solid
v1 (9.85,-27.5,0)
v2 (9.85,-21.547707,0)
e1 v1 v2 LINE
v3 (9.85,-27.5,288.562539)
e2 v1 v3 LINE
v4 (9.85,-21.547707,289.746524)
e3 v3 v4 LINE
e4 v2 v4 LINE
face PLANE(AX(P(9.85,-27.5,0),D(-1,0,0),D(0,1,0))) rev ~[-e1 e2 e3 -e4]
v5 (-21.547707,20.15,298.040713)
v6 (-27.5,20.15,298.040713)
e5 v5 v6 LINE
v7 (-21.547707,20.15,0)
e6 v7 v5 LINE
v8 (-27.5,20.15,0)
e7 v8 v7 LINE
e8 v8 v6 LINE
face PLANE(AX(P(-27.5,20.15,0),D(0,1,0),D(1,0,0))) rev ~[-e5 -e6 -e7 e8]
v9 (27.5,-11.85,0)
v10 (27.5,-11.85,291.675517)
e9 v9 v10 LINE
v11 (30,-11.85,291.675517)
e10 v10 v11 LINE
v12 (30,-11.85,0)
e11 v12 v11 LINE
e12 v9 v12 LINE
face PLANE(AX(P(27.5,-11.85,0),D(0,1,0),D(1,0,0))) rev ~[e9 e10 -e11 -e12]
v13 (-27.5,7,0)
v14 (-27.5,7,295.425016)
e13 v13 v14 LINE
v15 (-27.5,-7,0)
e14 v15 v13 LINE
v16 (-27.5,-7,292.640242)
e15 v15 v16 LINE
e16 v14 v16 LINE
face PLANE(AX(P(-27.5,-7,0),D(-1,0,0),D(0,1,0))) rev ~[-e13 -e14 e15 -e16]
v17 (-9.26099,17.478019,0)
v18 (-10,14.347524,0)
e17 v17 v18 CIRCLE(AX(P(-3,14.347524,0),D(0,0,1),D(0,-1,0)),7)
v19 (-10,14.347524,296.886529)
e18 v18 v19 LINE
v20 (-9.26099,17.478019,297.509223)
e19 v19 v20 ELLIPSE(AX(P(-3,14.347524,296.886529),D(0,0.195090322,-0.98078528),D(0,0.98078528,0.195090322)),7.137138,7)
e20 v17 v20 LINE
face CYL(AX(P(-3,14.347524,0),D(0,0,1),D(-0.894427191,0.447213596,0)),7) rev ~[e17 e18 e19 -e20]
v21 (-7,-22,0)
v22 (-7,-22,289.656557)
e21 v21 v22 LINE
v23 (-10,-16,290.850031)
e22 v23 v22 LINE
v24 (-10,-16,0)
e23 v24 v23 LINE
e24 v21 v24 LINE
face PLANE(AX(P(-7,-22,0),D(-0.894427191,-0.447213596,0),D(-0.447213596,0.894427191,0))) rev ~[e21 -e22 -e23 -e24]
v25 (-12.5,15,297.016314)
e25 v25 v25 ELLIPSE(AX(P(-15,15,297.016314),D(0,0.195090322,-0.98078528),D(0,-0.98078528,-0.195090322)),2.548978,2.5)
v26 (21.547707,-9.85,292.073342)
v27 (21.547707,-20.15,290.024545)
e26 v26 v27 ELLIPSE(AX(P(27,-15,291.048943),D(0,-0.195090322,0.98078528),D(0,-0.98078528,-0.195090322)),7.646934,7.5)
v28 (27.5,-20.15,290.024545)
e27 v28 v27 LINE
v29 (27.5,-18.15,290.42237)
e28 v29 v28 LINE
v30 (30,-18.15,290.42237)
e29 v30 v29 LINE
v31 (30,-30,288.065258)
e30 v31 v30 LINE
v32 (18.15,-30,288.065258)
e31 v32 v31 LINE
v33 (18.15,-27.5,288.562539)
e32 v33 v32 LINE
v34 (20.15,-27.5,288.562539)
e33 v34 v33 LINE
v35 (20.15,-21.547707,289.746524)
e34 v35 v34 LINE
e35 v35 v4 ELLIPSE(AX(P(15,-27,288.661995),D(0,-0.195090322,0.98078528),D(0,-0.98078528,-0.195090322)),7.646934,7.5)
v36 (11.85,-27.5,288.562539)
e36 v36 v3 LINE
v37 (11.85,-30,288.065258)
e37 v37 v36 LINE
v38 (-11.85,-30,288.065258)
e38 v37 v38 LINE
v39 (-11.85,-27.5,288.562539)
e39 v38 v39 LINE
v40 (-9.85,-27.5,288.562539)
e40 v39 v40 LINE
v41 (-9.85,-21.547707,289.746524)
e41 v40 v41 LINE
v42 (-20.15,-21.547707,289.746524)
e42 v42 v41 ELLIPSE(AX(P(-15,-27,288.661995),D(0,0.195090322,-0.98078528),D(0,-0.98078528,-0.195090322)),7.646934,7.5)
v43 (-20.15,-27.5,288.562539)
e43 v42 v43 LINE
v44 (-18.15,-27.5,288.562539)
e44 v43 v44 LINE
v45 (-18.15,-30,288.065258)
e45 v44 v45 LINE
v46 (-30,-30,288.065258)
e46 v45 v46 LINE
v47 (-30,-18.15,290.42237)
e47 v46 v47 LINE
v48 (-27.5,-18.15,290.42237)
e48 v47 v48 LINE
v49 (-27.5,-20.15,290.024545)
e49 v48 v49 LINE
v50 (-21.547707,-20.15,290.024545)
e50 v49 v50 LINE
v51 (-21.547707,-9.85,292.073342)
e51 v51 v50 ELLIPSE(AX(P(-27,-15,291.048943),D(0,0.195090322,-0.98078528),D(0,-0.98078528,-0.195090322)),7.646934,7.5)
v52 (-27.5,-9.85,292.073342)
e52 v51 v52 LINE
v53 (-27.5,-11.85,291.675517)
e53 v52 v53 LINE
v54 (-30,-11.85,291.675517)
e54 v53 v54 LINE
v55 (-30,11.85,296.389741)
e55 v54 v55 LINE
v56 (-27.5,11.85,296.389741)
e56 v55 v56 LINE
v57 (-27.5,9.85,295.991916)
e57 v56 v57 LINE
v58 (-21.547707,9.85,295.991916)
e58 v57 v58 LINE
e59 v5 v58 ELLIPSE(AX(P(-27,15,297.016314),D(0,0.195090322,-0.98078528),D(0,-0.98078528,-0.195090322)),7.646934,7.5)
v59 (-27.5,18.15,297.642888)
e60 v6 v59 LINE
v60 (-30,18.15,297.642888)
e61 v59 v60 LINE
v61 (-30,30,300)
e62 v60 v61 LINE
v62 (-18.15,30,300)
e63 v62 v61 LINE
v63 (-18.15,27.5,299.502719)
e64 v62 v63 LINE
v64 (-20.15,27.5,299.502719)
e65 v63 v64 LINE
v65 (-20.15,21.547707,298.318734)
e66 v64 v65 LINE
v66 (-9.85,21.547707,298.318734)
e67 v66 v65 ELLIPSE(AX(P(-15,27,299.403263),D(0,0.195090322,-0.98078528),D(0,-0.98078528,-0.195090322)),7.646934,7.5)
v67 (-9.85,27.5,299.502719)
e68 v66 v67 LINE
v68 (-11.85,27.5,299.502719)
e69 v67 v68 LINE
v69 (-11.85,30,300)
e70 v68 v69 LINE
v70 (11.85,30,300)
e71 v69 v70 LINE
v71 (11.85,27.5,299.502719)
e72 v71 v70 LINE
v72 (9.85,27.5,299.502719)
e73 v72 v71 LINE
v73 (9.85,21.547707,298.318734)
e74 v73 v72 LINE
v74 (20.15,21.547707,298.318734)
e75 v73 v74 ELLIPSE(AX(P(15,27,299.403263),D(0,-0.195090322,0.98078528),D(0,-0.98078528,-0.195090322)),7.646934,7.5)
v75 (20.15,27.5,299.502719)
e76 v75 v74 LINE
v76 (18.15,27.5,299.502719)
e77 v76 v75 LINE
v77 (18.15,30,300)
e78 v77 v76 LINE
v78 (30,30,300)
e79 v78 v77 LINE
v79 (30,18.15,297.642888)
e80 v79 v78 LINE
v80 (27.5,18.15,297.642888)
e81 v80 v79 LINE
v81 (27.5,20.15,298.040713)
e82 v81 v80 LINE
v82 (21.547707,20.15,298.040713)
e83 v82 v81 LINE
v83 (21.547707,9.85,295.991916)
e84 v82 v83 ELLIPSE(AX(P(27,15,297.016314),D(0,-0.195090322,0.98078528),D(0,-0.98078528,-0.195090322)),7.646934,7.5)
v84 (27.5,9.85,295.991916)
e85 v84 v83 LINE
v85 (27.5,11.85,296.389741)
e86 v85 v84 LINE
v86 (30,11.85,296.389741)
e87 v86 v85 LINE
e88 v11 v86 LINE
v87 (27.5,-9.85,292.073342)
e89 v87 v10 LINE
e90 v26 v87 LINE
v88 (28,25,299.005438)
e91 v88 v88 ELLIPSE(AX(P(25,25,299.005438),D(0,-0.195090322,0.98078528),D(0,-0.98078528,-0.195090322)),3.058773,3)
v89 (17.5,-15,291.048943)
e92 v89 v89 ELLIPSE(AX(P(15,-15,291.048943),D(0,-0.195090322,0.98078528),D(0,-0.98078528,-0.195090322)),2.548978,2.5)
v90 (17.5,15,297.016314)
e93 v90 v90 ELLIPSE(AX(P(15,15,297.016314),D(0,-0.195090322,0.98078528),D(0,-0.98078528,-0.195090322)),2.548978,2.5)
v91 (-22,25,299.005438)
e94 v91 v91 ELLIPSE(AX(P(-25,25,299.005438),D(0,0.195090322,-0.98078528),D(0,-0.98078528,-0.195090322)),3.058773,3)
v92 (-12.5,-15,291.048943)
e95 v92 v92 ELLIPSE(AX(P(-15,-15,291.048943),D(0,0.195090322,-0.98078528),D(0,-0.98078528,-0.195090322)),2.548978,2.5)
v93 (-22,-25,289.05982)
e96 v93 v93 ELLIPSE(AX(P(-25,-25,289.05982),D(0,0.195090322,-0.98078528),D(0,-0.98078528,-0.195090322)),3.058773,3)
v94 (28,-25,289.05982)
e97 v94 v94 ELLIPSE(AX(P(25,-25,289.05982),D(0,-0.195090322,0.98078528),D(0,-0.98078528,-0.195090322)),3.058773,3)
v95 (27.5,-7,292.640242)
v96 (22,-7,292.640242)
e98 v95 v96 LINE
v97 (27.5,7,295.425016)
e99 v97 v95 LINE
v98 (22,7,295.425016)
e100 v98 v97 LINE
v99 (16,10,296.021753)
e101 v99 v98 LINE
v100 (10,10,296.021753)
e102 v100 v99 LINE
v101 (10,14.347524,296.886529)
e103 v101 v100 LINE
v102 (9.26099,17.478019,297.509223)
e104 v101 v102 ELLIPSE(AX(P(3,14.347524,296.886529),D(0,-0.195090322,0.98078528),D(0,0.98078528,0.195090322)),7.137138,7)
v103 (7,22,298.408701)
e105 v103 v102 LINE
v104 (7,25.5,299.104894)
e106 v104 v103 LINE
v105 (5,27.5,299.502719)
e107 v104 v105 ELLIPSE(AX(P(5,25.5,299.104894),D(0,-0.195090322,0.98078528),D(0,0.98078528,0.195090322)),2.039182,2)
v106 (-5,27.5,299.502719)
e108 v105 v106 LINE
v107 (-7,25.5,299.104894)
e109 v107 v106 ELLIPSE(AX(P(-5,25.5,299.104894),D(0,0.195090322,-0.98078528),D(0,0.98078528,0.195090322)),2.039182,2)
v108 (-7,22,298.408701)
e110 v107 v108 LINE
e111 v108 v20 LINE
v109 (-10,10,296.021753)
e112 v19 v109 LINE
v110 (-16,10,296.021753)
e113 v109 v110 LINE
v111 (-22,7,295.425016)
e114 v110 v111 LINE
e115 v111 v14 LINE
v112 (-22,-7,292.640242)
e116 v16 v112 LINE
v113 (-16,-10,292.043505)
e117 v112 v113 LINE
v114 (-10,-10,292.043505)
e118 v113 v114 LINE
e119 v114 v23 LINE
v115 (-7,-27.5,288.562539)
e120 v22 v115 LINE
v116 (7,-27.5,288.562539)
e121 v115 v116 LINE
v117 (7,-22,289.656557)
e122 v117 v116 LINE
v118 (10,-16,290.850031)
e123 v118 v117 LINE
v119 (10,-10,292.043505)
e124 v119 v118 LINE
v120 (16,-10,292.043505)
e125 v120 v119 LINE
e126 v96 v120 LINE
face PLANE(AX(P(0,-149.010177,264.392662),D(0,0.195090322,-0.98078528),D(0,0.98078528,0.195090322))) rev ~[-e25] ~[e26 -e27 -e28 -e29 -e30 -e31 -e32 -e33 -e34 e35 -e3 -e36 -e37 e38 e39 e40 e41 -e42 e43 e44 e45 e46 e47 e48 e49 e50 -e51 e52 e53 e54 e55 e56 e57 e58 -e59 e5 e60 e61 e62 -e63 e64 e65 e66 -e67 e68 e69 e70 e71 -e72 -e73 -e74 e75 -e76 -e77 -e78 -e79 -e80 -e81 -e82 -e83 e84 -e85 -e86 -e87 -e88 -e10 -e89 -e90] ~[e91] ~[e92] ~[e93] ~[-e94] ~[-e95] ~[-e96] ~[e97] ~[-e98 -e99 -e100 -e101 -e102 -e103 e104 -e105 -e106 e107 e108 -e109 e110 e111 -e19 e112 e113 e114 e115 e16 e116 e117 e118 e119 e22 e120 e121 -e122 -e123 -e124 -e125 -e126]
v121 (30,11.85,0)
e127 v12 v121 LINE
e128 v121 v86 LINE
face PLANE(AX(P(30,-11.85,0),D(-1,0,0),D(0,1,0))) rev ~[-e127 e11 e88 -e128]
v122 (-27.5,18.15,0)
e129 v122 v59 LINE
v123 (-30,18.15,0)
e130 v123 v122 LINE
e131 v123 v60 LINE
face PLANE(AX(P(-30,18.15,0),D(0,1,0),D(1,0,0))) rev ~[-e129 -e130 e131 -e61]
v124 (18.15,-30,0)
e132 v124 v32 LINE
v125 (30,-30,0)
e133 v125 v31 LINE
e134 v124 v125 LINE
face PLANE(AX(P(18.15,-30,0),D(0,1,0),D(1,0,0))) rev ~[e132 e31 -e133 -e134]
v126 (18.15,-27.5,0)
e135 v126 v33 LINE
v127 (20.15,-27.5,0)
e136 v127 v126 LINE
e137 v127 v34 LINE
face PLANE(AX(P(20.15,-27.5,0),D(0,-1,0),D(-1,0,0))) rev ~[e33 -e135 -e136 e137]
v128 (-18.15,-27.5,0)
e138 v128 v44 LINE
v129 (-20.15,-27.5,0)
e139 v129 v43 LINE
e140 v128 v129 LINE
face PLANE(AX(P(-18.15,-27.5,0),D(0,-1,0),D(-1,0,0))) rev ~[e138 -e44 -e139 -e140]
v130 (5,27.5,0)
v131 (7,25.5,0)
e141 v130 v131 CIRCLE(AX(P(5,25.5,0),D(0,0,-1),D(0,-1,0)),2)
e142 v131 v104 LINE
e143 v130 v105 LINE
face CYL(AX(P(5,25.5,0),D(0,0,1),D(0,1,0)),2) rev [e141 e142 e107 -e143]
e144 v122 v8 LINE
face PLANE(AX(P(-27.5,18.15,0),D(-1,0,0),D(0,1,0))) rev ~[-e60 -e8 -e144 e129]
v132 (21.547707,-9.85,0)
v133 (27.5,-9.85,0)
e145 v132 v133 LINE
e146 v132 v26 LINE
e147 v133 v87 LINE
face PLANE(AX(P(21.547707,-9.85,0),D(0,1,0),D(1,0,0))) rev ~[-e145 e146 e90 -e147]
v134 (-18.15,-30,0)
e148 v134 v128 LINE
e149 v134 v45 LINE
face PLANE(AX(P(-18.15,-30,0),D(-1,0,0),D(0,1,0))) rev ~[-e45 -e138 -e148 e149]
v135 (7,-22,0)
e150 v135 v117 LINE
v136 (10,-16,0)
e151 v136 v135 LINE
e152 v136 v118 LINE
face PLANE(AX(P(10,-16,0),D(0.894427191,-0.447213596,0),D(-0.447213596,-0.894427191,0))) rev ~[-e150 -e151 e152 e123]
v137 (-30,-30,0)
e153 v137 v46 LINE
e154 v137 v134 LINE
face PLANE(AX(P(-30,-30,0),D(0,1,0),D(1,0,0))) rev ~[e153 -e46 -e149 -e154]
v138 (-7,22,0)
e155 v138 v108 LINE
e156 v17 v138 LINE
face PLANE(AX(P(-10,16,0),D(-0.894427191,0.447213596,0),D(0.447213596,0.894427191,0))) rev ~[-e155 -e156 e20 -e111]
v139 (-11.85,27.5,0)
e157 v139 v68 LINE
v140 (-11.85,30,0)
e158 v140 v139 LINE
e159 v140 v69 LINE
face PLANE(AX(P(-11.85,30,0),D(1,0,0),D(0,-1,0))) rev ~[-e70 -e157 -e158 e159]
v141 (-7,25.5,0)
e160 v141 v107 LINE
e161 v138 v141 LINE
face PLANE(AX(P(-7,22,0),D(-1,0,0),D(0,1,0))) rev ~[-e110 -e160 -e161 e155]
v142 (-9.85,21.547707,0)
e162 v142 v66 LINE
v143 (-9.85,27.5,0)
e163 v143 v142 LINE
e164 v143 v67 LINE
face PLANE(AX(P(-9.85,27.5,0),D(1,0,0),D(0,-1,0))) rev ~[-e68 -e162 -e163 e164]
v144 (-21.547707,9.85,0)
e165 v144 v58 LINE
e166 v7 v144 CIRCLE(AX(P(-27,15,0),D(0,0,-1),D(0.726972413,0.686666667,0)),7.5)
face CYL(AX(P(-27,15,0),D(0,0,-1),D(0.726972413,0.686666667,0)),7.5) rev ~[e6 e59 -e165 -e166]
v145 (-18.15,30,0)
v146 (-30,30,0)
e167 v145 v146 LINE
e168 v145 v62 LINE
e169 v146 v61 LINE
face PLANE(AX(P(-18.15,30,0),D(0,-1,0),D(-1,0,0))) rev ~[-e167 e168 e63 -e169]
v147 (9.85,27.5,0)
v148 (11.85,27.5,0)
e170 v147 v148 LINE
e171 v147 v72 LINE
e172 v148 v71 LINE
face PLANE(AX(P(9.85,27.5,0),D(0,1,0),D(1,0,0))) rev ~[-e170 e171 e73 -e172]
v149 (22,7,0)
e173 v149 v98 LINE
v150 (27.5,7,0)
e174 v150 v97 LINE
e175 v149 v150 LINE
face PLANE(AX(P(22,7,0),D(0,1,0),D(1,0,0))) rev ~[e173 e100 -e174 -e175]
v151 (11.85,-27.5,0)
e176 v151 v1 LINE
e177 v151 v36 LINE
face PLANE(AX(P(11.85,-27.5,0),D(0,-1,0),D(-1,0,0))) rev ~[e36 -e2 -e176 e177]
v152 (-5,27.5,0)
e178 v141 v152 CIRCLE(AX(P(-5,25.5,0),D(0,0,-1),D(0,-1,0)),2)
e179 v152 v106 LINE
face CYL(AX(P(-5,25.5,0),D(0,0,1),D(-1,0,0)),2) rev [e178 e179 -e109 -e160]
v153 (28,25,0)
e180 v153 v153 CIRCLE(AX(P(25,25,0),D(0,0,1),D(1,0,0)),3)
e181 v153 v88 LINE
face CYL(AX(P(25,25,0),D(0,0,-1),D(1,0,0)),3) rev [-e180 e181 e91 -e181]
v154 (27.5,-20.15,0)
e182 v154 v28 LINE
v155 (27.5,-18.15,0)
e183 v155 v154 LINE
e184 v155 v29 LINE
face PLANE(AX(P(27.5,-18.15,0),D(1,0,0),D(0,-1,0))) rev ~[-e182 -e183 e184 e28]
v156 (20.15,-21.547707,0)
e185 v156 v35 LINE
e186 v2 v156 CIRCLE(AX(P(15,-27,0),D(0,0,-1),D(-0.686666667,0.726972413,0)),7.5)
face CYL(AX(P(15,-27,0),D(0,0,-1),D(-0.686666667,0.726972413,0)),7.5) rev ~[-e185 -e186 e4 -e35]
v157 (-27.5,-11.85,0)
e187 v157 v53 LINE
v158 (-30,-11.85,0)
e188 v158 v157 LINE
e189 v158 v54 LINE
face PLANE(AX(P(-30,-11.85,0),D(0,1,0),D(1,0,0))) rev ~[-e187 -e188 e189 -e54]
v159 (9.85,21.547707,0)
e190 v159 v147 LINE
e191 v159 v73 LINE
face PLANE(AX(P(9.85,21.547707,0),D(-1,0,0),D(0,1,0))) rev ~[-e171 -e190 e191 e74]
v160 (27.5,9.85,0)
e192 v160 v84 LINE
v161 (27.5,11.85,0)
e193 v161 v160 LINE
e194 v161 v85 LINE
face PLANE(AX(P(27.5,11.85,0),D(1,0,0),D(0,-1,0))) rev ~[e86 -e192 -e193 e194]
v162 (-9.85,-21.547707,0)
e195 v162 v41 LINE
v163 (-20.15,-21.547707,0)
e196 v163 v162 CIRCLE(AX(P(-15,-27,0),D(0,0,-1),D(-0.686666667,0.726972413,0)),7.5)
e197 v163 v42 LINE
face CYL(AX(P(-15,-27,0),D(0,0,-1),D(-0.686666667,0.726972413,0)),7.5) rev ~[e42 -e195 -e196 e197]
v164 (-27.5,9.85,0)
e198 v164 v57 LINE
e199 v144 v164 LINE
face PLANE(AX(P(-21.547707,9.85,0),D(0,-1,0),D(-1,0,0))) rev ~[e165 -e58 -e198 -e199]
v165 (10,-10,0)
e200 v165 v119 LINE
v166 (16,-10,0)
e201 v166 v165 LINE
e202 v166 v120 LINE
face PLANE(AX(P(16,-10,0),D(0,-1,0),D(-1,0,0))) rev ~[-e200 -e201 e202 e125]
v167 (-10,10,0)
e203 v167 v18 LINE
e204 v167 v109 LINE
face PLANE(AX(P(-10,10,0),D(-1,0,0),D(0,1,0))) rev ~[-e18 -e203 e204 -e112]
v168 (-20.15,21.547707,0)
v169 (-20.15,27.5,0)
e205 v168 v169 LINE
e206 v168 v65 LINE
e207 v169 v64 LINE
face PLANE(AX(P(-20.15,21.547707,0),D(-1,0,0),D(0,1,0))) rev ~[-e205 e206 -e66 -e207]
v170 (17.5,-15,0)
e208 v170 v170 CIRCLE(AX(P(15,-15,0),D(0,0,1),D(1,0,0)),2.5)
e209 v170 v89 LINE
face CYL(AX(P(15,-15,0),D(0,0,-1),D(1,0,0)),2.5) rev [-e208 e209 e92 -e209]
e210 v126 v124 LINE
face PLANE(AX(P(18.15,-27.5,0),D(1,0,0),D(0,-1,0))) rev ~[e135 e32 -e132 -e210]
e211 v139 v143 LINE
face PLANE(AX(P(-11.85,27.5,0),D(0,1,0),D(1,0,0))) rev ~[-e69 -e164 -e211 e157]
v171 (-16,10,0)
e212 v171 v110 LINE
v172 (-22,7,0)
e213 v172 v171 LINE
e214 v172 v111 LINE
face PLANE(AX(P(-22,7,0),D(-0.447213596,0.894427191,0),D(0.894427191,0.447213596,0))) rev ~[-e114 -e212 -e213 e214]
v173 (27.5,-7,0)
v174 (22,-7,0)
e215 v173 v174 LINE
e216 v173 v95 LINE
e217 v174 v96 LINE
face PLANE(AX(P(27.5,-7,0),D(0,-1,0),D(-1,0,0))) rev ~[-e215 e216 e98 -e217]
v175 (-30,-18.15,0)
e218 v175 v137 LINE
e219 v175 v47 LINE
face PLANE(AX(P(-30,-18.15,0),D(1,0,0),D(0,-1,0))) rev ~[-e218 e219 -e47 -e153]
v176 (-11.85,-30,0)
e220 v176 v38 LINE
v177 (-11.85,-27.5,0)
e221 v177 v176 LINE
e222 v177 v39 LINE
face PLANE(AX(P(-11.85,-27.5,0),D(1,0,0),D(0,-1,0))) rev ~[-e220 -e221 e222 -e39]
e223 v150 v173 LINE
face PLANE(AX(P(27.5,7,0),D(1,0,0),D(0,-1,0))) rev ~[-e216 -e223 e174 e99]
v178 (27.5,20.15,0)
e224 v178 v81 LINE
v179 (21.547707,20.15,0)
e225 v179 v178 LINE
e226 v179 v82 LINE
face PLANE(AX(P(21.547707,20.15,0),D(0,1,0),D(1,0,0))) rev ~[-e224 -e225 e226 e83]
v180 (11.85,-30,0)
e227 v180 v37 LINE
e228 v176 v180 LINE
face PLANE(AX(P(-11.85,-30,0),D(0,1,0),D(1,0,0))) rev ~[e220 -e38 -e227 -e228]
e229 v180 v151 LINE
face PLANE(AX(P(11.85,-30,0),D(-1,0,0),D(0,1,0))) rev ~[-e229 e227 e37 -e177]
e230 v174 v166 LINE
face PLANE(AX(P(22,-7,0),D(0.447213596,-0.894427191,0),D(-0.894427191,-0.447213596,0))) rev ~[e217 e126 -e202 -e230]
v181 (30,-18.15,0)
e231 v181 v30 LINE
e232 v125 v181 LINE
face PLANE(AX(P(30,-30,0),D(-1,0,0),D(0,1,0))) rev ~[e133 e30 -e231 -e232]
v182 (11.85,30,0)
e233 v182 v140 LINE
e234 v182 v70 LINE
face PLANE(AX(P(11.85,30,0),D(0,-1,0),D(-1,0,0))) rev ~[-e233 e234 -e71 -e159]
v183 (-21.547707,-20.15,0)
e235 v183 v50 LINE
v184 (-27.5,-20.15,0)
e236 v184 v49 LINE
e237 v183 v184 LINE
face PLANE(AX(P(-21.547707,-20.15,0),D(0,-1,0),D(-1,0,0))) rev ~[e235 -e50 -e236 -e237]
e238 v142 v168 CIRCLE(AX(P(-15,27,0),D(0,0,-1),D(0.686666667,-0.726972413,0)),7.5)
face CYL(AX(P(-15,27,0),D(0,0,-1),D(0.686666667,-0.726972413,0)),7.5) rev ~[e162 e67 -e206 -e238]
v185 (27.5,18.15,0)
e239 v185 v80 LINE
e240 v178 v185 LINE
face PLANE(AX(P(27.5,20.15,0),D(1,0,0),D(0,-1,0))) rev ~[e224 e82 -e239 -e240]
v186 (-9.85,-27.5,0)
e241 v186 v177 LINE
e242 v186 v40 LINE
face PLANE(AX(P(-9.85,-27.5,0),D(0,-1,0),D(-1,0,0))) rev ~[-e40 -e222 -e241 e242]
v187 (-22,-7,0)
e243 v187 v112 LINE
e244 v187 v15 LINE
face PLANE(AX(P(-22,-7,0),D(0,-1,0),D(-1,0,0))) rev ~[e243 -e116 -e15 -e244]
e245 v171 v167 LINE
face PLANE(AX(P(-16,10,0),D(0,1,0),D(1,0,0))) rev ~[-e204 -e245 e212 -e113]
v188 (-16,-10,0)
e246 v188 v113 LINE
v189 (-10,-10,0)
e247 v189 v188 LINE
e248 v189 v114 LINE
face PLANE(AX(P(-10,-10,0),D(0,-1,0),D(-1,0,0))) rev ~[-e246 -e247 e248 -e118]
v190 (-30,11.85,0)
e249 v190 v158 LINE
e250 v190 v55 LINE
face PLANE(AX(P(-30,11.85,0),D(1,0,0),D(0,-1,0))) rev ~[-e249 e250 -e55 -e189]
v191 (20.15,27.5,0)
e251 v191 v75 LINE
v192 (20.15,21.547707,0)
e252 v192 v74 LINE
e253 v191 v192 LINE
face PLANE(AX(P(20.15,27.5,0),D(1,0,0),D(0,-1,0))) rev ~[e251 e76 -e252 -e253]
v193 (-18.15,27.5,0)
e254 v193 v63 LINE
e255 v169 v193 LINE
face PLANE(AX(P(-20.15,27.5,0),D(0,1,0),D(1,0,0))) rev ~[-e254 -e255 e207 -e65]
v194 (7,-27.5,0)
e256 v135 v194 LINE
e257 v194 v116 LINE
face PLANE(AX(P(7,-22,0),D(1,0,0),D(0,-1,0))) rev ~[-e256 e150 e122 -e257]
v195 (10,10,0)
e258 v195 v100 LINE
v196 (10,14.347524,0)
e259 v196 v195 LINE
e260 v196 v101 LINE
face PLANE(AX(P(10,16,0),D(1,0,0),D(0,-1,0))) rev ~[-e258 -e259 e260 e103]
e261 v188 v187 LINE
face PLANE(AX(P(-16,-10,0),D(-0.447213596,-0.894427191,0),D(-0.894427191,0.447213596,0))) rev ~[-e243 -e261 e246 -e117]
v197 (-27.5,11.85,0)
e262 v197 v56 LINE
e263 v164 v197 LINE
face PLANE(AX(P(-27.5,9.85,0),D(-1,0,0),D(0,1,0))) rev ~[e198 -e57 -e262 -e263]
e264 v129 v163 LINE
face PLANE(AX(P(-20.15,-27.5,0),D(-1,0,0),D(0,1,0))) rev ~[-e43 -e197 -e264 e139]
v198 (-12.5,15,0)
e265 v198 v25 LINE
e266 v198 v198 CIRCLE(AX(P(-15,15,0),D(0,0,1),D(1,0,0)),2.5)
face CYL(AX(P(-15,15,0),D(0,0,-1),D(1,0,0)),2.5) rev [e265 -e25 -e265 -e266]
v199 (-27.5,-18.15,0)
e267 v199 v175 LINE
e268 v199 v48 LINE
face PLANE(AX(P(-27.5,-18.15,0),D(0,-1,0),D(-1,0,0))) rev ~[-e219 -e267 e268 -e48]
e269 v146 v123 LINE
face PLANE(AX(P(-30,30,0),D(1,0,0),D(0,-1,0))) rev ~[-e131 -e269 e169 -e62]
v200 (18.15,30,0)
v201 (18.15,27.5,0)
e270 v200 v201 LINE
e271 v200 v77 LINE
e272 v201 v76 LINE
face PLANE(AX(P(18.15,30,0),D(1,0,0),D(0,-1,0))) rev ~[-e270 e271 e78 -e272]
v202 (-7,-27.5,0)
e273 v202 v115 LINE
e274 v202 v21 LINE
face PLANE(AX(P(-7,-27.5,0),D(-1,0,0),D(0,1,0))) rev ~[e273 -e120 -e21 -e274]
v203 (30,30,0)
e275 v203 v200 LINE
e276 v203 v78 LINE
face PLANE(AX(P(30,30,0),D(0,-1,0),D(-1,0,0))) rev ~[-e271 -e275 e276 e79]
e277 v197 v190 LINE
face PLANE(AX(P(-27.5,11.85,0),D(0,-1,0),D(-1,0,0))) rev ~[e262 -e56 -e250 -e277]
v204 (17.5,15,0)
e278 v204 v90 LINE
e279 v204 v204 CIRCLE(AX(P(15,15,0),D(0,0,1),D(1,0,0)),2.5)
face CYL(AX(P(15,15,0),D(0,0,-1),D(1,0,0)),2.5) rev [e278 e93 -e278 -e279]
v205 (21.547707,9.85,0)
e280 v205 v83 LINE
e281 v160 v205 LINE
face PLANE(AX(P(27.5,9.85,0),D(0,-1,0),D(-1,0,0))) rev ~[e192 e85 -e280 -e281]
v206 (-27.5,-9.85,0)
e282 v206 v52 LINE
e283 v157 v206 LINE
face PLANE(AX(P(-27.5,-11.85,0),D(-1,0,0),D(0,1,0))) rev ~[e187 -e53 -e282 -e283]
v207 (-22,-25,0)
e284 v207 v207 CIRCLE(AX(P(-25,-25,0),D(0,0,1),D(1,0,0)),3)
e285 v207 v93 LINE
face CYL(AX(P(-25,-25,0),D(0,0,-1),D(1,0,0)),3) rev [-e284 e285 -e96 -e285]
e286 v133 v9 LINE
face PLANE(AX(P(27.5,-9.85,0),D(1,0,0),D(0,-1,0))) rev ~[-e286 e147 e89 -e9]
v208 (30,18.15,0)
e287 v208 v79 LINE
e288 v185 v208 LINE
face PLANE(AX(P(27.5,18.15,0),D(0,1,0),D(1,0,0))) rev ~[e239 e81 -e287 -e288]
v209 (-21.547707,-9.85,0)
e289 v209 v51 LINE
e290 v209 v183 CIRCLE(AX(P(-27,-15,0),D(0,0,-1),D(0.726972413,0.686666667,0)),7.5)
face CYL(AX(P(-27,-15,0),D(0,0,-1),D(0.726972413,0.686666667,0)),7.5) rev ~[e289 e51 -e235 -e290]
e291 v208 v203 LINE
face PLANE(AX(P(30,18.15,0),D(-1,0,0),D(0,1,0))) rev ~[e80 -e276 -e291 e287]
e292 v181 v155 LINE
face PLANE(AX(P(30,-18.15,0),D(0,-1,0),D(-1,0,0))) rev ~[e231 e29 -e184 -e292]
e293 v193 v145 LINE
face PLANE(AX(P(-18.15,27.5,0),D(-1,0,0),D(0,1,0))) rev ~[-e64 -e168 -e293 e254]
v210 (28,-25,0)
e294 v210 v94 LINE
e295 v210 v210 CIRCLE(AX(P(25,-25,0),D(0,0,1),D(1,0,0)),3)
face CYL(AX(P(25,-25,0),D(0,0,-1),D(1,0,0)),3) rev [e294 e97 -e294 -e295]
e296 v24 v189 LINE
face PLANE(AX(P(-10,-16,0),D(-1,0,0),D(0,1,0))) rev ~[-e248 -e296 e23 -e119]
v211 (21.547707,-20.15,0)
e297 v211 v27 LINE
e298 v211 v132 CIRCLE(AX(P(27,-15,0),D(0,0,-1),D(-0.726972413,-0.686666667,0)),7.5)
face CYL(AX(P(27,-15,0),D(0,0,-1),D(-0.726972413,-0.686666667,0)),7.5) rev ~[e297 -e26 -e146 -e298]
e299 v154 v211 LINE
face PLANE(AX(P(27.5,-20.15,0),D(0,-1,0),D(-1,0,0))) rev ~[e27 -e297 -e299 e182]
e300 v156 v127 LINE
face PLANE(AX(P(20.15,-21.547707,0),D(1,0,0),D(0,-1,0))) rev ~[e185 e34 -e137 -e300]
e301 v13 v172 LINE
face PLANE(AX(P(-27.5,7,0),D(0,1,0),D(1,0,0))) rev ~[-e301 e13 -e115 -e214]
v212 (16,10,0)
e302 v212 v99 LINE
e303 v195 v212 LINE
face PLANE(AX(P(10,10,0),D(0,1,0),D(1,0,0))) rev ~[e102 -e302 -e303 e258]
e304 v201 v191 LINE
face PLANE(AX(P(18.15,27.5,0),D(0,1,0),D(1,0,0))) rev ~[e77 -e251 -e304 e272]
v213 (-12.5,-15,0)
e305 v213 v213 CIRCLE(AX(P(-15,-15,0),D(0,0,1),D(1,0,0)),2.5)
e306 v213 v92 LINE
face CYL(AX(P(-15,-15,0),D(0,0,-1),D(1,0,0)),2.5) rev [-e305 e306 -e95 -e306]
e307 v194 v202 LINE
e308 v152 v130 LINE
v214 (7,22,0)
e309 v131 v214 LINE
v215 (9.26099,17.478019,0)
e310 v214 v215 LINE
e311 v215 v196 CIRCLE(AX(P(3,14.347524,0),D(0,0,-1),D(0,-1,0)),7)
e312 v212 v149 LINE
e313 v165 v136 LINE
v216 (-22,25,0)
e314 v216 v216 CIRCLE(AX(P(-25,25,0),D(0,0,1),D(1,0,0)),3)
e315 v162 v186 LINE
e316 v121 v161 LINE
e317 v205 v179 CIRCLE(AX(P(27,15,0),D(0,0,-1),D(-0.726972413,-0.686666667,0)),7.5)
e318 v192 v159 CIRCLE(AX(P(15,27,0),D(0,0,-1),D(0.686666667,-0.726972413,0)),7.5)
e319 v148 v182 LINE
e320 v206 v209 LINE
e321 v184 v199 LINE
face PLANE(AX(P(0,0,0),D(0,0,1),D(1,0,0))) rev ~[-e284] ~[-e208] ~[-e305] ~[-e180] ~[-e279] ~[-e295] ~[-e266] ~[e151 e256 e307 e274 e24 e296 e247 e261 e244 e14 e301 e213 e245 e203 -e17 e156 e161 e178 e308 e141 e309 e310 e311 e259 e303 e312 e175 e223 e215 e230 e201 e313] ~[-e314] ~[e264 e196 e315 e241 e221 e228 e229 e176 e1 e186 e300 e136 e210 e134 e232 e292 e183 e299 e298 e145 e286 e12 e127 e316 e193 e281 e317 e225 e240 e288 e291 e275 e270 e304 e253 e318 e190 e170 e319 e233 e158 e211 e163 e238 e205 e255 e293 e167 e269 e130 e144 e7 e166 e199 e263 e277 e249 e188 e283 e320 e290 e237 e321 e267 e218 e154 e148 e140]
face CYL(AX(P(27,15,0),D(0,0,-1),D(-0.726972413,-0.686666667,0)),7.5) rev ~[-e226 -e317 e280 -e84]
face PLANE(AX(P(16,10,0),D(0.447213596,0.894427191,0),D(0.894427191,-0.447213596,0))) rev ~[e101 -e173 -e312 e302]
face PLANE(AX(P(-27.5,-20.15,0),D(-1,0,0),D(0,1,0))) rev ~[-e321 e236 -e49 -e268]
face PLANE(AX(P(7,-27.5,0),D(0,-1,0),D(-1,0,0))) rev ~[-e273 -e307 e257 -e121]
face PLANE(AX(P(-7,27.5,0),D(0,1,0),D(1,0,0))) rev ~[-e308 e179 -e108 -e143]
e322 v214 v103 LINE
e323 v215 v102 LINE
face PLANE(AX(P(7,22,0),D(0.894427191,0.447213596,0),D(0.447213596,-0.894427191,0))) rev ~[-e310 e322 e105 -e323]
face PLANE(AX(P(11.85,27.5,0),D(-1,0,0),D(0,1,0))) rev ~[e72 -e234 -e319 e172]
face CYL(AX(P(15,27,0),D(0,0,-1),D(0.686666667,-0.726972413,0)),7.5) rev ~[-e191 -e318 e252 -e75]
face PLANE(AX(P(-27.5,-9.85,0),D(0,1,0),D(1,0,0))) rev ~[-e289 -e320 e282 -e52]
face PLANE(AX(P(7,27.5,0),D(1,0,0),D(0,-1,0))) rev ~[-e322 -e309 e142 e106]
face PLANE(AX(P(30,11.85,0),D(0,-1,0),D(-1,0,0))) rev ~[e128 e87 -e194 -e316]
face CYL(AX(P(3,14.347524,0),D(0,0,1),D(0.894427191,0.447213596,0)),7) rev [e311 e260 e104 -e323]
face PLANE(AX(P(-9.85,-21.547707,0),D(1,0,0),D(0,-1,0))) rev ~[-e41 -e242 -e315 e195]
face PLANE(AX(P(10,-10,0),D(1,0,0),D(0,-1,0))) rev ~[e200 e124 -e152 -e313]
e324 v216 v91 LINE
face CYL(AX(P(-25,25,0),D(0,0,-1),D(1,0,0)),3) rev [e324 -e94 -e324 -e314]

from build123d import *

# Parameters (mm, degrees)
F0_R          = 3
F0_R_2        = 2.5
F1_DEPTH      = 300
F2_R          = 2
F3_R          = 7
F5_DEPTH      = 30
F5_DEPTH_BACK = 30


# Not quite as in the source:
# - a feature names something its author has since deleted; it is built from what else it names


with BuildPart() as f1:
    # F0 (on Top) → F1 (new body)
    with BuildSketch(Plane.XY):
        with BuildLine():
            Line((18.15, -30), (30, -30))
            Line((30, -30), (30, -18.15))
            Line((30, -18.15), (27.5, -18.15))
            Line((27.5, -18.15), (27.5, -20.15))
            Line((27.5, -20.15), (21.5477069044, -20.15))
            ThreePointArc((21.5477069044, -20.15), (19.5, -15), (21.5477069044, -9.85))
            Line((21.5477069044, -9.85), (27.5, -9.85))
            Line((27.5, -9.85), (27.5, -11.85))
            Line((27.5, -11.85), (30, -11.85))
            Line((30, -11.85), (30, 11.85))
            Line((30, 11.85), (27.5, 11.85))
            Line((27.5, 11.85), (27.5, 9.85))
            Line((27.5, 9.85), (21.5477069044, 9.85))
            ThreePointArc((21.5477069044, 9.85), (19.5, 15), (21.5477069044, 20.15))
            Line((21.5477069044, 20.15), (27.5, 20.15))
            Line((27.5, 20.15), (27.5, 18.15))
            Line((27.5, 18.15), (30, 18.15))
            Line((30, 18.15), (30, 30))
            Line((30, 30), (18.15, 30))
            Line((18.15, 30), (18.15, 27.5))
            Line((18.15, 27.5), (20.15, 27.5))
            Line((20.15, 27.5), (20.15, 21.5477069044))
            ThreePointArc((20.15, 21.5477069044), (15, 19.5), (9.85, 21.5477069044))
            Line((9.85, 21.5477069044), (9.85, 27.5))
            Line((9.85, 27.5), (11.85, 27.5))
            Line((11.85, 27.5), (11.85, 30))
            Line((11.85, 30), (-11.85, 30))
            Line((-11.85, 30), (-11.85, 27.5))
            Line((-11.85, 27.5), (-9.85, 27.5))
            Line((-9.85, 27.5), (-9.85, 21.5477069044))
            ThreePointArc((-9.85, 21.5477069044), (-15, 19.5), (-20.15, 21.5477069044))
            Line((-20.15, 21.5477069044), (-20.15, 27.5))
            Line((-20.15, 27.5), (-18.15, 27.5))
            Line((-18.15, 27.5), (-18.15, 30))
            Line((-18.15, 30), (-30, 30))
            Line((-30, 30), (-30, 18.15))
            Line((-30, 18.15), (-27.5, 18.15))
            Line((-27.5, 18.15), (-27.5, 20.15))
            Line((-27.5, 20.15), (-21.5477069044, 20.15))
            ThreePointArc((-21.5477069044, 20.15), (-19.5, 15), (-21.5477069044, 9.85))
            Line((-21.5477069044, 9.85), (-27.5, 9.85))
            Line((-27.5, 9.85), (-27.5, 11.85))
            Line((-27.5, 11.85), (-30, 11.85))
            Line((-30, 11.85), (-30, -11.85))
            Line((-30, -11.85), (-27.5, -11.85))
            Line((-27.5, -11.85), (-27.5, -9.85))
            Line((-27.5, -9.85), (-21.5477069044, -9.85))
            ThreePointArc((-21.5477069044, -9.85), (-19.5, -15), (-21.5477069044, -20.15))
            Line((-21.5477069044, -20.15), (-27.5, -20.15))
            Line((-27.5, -20.15), (-27.5, -18.15))
            Line((-27.5, -18.15), (-30, -18.15))
            Line((-30, -18.15), (-30, -30))
            Line((-30, -30), (-18.15, -30))
            Line((-18.15, -30), (-18.15, -27.5))
            Line((-18.15, -27.5), (-20.15, -27.5))
            Line((-20.15, -27.5), (-20.15, -21.5477069044))
            ThreePointArc((-20.15, -21.5477069044), (-15, -19.5), (-9.85, -21.5477069044))
            Line((-9.85, -21.5477069044), (-9.85, -27.5))
            Line((-9.85, -27.5), (-11.85, -27.5))
            Line((-11.85, -27.5), (-11.85, -30))
            Line((-11.85, -30), (11.85, -30))
            Line((11.85, -30), (11.85, -27.5))
            Line((11.85, -27.5), (9.85, -27.5))
            Line((9.85, -27.5), (9.85, -21.5477069044))
            ThreePointArc((9.85, -21.5477069044), (15, -19.5), (20.15, -21.5477069044))
            Line((20.15, -21.5477069044), (20.15, -27.5))
            Line((20.15, -27.5), (18.15, -27.5))
            Line((18.15, -27.5), (18.15, -30))
        make_face()
        with Locations((-25, -25)):
            Circle(F0_R, mode=Mode.SUBTRACT)
        with Locations((-15, -15)):
            Circle(F0_R_2, mode=Mode.SUBTRACT)
        with Locations((25, -25)):
            Circle(F0_R, mode=Mode.SUBTRACT)
        with Locations((15, -15)):
            Circle(F0_R_2, mode=Mode.SUBTRACT)
        with Locations((-25, 25)):
            Circle(F0_R, mode=Mode.SUBTRACT)
        with Locations((-15, 15)):
            Circle(F0_R_2, mode=Mode.SUBTRACT)
        Polygon((-7, 22), (-7, 27.5), (0, 27.5), (7, 27.5), (7, 22), (10, 16), (10, 10), (16, 10), (22, 7), (27.5, 7), (27.5, 0), (27.5, -7), (22, -7), (16, -10), (10, -10), (10, -16), (7, -22), (7, -27.5), (0, -27.5), (-7, -27.5), (-7, -22), (-10, -16), (-10, -10), (-16, -10), (-22, -7), (-27.5, -7), (-27.5, 0), (-27.5, 7), (-22, 7), (-16, 10), (-10, 10), (-10, 16), align=None, mode=Mode.SUBTRACT)
        with Locations((15, 15)):
            Circle(F0_R_2, mode=Mode.SUBTRACT)
        with Locations((25, 25)):
            Circle(F0_R, mode=Mode.SUBTRACT)
    extrude(amount=F1_DEPTH)

    # F2
    f2_edges = [f1.edges().sort_by_distance(p)[0] for p in [
        (-7, 27.5, 150),
        (7, 27.5, 150),
    ]]
    fillet(f2_edges, radius=F2_R)

    # F3
    f3_edges = [f1.edges().sort_by_distance(p)[0] for p in [
        (-10, 16, 150),
        (10, 16, 150),
    ]]
    fillet(f3_edges, radius=F3_R)

    # F4 (on Right) → F5 (cut, two sides)
    with BuildSketch(Plane.YZ) as f5_sk:
        Polygon((-20.5082305996, 553.922022371), (-199.5184071674, 518.3146843648), (-149.0101765678, 264.3926619939), (30, 300), align=None)
    extrude(amount=F5_DEPTH, mode=Mode.SUBTRACT)
    extrude(f5_sk.sketch, amount=-F5_DEPTH_BACK, mode=Mode.SUBTRACT)


solid = f1.part
